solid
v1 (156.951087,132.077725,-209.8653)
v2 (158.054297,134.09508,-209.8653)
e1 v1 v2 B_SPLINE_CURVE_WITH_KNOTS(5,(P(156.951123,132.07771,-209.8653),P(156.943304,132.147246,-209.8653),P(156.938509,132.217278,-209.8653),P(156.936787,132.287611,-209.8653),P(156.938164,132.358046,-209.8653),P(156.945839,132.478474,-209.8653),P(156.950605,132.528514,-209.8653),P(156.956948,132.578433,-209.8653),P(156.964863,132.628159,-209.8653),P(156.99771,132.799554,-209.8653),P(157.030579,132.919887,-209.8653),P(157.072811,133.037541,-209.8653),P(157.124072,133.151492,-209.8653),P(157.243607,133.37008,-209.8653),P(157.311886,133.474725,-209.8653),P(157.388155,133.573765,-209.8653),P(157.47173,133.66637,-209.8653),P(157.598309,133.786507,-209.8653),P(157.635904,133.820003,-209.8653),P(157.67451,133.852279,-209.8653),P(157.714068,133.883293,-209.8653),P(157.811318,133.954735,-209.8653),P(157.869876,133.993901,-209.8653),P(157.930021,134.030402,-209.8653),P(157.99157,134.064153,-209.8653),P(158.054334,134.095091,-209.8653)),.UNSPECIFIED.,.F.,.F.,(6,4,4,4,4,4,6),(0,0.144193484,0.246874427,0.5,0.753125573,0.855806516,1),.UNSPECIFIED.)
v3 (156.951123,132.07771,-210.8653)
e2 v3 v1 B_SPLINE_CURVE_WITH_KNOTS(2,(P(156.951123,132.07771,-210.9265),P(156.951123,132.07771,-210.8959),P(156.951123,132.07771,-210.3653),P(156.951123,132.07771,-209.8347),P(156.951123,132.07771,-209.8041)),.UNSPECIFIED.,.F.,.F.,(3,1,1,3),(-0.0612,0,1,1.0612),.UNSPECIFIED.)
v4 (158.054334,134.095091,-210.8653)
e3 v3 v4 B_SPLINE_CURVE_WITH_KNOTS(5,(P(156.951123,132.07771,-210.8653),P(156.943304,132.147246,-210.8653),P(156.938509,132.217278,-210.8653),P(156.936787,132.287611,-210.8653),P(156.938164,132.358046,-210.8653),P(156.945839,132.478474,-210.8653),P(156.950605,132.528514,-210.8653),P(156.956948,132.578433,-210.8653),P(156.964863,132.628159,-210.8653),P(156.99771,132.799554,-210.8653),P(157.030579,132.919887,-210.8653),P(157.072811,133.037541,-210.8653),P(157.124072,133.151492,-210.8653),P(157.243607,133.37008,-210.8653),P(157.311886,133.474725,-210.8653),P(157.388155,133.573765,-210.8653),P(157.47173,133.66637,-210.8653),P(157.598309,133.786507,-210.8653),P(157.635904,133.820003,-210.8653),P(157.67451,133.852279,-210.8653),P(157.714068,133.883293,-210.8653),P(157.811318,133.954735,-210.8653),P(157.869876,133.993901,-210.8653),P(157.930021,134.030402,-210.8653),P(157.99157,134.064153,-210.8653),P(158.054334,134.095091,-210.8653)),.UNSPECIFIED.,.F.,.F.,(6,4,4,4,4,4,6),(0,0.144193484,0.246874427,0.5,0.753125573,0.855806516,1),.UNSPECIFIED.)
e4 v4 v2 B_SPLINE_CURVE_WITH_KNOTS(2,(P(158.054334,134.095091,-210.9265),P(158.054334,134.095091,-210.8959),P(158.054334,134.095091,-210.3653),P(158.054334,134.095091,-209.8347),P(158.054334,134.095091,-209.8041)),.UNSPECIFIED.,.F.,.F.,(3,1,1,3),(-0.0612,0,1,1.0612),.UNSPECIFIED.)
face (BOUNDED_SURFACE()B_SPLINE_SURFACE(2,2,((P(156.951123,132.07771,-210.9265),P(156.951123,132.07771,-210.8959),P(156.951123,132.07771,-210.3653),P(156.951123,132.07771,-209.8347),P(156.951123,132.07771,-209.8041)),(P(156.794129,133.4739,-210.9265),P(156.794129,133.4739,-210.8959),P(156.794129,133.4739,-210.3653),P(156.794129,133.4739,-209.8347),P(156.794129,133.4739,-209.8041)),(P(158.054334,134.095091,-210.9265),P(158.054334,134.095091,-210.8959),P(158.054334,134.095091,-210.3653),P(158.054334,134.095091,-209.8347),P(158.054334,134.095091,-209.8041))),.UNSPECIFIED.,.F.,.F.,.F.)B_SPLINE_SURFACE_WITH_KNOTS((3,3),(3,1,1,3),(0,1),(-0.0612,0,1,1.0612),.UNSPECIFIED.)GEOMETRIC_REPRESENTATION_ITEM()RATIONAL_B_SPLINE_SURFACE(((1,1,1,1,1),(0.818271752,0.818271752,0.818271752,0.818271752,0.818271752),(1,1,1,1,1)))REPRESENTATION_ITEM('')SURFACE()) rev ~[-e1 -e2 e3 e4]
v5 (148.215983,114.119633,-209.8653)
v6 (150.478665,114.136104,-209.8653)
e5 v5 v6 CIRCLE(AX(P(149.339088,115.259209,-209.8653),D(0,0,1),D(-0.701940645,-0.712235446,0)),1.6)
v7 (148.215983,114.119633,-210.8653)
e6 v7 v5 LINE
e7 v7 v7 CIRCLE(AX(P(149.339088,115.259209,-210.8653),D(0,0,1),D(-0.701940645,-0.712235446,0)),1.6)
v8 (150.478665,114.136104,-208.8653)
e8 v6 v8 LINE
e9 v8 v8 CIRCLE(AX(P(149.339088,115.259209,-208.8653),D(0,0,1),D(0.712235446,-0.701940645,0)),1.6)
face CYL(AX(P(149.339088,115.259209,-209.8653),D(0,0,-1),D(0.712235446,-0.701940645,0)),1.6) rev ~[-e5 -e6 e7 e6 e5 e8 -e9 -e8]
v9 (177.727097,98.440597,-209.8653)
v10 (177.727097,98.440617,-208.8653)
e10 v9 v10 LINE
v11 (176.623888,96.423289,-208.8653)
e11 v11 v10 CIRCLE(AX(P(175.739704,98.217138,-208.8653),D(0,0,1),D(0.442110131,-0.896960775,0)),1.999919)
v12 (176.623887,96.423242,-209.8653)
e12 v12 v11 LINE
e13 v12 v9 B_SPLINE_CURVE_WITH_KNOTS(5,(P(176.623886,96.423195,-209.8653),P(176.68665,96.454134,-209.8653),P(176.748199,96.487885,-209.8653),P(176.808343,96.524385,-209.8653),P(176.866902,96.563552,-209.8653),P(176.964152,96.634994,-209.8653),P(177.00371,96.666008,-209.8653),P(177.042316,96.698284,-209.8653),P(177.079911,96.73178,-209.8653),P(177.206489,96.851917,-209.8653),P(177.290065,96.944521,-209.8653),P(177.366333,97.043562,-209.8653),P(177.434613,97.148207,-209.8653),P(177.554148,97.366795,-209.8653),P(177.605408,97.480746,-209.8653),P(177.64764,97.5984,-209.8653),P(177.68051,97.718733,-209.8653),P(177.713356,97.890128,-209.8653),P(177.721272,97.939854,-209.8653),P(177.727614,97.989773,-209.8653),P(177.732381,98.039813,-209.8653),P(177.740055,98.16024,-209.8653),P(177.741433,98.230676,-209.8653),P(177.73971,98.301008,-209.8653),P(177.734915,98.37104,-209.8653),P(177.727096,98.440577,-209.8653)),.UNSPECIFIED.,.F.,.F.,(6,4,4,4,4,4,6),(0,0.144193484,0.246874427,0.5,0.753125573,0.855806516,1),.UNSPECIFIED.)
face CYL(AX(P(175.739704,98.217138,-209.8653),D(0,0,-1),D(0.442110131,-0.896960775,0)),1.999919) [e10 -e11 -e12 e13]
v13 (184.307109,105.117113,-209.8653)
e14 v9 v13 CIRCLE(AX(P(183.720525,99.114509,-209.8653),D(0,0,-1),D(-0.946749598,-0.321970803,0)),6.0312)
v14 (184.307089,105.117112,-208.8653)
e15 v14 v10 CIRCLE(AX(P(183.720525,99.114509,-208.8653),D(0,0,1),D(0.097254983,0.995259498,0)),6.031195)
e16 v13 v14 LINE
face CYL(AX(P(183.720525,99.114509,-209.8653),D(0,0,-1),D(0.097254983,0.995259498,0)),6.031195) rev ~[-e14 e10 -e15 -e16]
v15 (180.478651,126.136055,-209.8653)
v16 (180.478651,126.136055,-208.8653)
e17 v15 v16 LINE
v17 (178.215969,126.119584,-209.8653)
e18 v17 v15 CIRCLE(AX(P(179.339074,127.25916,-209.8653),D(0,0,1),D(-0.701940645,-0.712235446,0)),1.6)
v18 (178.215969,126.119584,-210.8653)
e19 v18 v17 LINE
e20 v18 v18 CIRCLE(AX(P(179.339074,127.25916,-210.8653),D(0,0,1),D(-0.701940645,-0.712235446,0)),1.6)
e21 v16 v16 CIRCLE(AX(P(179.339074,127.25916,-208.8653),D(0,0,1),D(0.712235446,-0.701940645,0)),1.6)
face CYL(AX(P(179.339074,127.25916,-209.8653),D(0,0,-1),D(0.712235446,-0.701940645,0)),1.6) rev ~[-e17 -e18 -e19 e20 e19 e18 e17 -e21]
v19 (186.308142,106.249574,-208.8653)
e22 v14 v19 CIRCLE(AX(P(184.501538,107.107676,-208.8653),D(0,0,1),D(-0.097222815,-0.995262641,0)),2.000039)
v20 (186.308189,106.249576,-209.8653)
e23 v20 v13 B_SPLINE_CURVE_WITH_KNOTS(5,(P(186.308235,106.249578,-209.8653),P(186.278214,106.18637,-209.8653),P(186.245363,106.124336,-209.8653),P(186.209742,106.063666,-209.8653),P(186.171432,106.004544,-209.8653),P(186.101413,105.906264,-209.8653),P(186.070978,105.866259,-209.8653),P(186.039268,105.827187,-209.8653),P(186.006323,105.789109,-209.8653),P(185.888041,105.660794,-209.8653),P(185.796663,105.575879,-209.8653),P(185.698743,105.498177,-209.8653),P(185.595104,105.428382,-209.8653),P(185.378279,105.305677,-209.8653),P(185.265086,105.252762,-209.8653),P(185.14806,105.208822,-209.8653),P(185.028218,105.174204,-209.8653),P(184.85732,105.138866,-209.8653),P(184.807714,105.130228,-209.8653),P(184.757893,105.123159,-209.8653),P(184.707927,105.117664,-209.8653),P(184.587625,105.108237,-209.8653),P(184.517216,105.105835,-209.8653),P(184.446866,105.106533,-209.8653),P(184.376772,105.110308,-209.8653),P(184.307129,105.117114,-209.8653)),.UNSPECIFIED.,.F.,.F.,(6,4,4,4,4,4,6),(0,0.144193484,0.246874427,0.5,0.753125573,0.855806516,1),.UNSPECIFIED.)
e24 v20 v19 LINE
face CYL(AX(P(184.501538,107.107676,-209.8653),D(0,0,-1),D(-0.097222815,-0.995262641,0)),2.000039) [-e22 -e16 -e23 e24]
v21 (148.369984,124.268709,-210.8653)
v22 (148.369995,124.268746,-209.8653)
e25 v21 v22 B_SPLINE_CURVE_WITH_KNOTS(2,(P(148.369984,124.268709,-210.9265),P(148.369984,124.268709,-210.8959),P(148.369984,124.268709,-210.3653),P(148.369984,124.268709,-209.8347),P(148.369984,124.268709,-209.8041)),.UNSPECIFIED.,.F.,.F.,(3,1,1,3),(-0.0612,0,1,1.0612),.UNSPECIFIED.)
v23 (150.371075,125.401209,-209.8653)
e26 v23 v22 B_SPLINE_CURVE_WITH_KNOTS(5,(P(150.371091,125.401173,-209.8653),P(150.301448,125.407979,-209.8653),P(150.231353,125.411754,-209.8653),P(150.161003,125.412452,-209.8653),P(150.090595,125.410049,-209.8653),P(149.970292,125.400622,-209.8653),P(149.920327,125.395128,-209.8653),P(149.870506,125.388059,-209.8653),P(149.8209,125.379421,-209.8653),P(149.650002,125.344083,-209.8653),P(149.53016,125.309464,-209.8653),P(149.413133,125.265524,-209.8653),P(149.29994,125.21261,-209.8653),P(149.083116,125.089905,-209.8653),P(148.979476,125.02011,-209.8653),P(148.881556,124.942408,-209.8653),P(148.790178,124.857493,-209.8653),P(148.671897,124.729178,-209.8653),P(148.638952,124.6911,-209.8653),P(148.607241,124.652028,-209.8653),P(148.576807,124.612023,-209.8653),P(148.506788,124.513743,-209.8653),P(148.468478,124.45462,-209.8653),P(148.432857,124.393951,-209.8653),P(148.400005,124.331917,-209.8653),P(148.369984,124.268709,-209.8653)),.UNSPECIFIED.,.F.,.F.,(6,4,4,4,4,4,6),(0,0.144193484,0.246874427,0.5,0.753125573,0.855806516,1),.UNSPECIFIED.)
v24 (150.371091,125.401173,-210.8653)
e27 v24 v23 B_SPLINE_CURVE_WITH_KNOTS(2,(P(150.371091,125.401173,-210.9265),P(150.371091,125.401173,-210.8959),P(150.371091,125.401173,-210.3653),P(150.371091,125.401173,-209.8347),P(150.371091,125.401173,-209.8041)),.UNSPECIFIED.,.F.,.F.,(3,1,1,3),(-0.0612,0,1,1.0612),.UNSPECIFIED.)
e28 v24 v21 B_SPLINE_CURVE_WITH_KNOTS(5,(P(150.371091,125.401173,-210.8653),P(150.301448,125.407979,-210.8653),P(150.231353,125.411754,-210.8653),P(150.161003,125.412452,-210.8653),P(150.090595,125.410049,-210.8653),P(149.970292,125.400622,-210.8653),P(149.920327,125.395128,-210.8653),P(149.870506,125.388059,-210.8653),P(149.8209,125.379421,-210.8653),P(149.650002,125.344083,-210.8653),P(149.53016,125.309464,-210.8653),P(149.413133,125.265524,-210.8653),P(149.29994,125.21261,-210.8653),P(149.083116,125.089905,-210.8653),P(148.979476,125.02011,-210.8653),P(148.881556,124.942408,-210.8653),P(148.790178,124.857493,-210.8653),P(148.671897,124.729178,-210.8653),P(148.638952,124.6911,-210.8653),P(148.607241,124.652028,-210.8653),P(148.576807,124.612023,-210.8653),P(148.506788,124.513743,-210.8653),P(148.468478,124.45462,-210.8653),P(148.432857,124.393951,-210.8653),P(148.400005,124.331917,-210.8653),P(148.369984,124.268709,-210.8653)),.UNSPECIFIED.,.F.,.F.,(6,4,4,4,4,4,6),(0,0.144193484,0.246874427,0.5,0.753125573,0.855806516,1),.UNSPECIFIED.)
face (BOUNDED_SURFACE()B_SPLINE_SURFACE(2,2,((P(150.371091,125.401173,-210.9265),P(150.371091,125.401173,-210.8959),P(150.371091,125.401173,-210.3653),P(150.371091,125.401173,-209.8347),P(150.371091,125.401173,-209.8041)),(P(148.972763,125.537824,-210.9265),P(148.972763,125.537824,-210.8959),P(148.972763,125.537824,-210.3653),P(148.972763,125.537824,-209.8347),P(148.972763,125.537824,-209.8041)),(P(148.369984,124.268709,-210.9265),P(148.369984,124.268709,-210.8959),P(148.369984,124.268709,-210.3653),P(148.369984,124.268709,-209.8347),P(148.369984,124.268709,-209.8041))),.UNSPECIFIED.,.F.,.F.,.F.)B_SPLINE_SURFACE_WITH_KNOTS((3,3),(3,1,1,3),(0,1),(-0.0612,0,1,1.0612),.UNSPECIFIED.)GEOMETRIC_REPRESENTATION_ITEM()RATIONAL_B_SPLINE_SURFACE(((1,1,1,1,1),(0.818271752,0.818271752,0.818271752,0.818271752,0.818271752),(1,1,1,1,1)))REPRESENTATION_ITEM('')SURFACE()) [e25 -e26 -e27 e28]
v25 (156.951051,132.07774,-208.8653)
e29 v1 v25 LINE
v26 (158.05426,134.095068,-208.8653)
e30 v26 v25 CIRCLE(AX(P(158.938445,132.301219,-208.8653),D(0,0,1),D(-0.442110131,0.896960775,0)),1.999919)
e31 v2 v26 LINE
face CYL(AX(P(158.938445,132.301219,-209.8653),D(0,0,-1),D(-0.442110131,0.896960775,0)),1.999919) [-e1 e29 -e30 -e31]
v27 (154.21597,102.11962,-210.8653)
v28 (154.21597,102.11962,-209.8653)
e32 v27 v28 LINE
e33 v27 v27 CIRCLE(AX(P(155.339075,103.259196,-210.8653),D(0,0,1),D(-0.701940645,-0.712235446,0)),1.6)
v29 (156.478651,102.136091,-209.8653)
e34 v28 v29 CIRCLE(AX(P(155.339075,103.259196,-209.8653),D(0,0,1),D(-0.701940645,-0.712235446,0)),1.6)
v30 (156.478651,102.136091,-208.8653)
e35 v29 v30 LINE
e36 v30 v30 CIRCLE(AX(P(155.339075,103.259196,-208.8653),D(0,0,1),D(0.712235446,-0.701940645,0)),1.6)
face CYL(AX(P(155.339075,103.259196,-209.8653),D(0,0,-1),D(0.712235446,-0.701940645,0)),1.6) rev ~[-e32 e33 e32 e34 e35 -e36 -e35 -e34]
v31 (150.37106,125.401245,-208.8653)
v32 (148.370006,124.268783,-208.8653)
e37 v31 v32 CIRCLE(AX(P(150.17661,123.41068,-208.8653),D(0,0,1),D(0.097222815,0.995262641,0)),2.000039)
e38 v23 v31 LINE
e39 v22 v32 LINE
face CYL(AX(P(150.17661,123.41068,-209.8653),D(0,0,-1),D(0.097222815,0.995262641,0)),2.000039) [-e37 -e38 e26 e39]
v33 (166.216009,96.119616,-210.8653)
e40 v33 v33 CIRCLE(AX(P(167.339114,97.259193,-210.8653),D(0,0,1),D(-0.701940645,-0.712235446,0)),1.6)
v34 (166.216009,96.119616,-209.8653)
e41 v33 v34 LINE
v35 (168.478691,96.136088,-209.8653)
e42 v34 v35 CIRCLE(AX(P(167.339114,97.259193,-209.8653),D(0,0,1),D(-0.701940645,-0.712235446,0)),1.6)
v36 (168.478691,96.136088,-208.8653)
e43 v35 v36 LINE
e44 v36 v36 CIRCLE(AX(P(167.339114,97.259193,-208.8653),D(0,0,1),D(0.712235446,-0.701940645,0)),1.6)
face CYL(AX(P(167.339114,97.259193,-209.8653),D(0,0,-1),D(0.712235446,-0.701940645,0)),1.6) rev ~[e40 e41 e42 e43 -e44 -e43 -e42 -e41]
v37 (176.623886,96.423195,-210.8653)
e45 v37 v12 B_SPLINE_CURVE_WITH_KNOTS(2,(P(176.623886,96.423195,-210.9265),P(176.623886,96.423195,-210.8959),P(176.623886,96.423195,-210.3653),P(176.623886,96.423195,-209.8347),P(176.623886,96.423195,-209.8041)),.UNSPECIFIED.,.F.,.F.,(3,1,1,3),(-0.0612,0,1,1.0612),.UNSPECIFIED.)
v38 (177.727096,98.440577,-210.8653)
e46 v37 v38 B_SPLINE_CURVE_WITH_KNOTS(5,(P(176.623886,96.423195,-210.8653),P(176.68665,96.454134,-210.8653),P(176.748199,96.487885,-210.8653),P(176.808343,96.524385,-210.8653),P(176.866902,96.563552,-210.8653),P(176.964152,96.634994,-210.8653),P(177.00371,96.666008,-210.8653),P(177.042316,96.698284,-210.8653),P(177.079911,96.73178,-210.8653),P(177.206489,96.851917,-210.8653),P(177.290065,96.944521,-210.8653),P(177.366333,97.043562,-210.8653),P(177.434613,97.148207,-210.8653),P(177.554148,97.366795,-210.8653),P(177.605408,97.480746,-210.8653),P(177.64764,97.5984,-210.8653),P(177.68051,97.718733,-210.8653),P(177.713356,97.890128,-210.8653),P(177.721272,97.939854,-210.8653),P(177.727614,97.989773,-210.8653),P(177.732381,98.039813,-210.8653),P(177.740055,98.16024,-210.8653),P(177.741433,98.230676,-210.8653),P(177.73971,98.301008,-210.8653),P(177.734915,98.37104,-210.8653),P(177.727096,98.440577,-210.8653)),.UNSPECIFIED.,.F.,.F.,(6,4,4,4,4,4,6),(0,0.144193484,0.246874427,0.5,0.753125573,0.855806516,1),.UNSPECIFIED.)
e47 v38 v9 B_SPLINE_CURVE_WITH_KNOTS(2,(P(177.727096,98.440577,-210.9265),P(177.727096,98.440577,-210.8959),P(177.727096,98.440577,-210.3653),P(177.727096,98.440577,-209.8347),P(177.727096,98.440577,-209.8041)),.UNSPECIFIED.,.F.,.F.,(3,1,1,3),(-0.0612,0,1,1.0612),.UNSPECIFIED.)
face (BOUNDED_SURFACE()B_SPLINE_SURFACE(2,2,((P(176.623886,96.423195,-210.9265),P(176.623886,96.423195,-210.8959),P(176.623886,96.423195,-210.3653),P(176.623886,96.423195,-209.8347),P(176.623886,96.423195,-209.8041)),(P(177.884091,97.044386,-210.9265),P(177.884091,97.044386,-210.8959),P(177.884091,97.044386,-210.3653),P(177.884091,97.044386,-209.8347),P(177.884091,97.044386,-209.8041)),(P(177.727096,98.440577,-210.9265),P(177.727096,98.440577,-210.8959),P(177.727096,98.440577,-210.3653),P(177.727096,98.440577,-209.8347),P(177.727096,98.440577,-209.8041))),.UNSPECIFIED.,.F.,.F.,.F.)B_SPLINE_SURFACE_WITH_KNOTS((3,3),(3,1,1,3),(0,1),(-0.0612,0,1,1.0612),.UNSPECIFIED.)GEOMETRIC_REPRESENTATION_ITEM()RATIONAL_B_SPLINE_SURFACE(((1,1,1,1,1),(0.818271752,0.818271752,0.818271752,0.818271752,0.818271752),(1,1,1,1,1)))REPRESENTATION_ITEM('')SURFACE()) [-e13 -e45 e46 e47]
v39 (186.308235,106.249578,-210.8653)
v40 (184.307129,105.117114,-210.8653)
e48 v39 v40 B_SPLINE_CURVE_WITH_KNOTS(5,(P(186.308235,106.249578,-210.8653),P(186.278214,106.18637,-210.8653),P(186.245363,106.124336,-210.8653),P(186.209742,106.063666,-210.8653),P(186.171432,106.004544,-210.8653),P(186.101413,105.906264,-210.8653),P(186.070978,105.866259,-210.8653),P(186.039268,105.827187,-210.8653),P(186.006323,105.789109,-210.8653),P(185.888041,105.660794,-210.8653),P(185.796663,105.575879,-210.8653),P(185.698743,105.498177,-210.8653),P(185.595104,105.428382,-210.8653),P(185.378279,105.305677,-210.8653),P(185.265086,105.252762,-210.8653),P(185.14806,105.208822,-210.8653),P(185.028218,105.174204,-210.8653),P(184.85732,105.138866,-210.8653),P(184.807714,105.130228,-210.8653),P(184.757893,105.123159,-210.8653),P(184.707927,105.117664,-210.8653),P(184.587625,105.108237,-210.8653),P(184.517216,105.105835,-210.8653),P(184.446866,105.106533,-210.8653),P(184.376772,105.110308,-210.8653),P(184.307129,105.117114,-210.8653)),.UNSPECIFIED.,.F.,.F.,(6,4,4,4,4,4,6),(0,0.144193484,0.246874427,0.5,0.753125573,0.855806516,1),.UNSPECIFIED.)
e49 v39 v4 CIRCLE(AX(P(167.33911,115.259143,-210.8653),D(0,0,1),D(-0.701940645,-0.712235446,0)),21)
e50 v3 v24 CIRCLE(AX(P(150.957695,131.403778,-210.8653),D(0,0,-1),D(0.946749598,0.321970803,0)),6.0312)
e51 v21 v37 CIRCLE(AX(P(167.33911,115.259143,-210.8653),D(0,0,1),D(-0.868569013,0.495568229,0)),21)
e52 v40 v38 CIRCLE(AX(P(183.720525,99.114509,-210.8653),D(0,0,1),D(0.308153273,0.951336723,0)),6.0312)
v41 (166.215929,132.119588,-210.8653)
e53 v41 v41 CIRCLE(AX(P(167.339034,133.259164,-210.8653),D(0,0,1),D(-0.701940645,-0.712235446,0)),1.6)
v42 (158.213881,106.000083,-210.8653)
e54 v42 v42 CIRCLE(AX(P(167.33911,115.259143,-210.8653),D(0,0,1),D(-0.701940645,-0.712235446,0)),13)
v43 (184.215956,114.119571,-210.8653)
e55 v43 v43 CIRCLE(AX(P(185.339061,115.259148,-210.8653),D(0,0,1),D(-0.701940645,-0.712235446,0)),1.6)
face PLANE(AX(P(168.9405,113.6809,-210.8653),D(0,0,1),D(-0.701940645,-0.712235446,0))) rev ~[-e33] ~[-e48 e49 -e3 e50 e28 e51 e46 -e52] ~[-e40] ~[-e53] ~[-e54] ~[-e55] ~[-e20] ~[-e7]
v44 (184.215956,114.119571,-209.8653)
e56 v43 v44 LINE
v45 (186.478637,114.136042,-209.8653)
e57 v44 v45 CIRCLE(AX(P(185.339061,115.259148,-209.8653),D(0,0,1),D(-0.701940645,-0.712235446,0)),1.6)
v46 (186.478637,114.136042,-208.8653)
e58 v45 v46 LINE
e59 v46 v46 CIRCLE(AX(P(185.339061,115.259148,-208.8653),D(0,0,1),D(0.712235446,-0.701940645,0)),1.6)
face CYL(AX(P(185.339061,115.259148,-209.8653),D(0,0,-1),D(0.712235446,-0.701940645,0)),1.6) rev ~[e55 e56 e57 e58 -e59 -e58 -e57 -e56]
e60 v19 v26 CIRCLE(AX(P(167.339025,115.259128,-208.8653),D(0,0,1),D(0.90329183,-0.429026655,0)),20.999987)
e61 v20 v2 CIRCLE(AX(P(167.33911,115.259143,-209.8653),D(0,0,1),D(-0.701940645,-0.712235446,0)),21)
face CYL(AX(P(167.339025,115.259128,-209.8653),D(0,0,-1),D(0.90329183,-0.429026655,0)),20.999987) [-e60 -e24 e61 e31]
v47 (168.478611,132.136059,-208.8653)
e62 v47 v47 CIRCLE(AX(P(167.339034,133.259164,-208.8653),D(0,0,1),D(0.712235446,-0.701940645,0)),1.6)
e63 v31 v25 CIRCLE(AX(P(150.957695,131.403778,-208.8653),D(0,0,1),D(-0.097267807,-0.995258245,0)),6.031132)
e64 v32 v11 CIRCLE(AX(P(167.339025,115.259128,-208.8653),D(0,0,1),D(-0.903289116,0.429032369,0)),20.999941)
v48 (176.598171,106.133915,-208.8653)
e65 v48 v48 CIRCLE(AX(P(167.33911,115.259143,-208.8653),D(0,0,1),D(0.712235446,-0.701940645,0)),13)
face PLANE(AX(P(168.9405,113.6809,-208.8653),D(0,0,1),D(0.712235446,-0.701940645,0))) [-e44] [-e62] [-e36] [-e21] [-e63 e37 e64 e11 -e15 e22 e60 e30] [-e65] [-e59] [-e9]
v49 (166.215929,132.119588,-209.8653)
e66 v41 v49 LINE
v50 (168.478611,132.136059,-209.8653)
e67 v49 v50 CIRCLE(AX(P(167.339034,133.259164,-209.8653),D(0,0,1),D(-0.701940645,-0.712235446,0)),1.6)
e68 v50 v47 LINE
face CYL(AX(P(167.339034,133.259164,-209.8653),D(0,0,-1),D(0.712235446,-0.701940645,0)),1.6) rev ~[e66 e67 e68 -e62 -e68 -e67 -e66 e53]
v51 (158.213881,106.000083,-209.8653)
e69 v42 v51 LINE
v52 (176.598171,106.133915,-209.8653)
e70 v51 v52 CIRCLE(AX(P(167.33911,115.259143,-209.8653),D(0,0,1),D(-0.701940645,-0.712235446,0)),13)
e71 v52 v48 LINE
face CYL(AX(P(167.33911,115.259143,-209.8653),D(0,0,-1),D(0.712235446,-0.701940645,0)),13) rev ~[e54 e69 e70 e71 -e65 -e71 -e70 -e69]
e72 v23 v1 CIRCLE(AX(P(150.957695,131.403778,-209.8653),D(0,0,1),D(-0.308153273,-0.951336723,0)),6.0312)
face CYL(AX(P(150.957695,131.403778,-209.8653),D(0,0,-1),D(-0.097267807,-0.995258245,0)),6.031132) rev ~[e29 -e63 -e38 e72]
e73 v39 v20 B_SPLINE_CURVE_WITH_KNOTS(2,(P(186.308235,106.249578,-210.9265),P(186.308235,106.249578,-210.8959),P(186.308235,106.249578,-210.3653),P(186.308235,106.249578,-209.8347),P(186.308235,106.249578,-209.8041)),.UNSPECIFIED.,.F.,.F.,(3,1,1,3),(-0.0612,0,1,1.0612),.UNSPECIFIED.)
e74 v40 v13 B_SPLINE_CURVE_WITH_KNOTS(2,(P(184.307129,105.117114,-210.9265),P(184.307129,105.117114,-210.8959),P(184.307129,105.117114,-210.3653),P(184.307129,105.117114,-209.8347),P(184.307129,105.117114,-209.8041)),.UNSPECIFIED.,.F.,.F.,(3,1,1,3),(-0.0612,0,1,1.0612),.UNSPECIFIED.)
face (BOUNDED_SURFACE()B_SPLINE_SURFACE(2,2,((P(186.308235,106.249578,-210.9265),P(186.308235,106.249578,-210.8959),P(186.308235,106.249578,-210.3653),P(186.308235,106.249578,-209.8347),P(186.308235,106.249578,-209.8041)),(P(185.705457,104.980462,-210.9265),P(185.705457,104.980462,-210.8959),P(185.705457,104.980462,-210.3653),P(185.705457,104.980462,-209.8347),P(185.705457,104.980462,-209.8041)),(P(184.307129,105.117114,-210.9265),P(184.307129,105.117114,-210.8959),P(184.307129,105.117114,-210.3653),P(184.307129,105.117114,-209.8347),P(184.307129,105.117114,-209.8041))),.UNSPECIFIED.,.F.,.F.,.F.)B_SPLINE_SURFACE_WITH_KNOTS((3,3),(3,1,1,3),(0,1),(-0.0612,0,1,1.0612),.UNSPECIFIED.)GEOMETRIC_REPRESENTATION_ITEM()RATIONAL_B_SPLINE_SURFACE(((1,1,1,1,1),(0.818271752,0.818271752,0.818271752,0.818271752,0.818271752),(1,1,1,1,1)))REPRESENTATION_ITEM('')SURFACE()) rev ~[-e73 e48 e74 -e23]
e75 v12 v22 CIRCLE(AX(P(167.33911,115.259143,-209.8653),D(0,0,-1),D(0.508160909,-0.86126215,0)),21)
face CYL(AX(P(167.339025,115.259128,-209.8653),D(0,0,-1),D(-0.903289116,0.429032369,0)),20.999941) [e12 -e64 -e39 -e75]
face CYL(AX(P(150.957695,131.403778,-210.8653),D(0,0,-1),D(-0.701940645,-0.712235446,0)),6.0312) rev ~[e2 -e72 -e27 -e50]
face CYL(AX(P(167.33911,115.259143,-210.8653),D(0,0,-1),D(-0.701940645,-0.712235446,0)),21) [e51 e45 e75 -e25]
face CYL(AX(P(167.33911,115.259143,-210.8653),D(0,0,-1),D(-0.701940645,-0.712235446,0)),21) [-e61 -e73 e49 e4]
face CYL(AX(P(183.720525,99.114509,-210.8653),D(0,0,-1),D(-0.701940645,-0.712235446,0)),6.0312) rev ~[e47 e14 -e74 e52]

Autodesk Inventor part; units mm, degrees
ref_plane "YZ Plane" through (0, 0, 0) normal (1, 0, 0) x (0, 1, 0)
ref_plane "XZ Plane" through (0, 0, 0) normal (0, 1, 0) x (-1, 0, 0)
ref_plane "작업 평면1" through (168.9405, 113.6809, -210.8653) normal (0, 0, 1) x (-0.7019406, -0.7122354, 0)
sketch "스케치1" plane through (168.9405, 113.6809, -210.8653) normal (0, 0, 1) x (-0.7019406, -0.7122354, 0)
  circle A0 centre (0, -25.2484) radius 3 projected
  circle A1 centre (0, -2.2484) radius 13 projected
  circle A2 centre (-12.6349, 10.5718) radius 1.6 projected
  circle A3 centre (12.6349, -15.0687) radius 1.6 projected
  circle A4 centre (0.1235, 14.7217) radius 1.6 projected
  circle A5 centre (-0.1235, -19.2186) radius 1.6 projected
  circle A6 centre (-16.9701, -2.1249) radius 1.6 projected
  circle A7 centre (16.9701, -2.372) radius 1.6 projected
  circle A8 centre (12.8202, 10.3865) radius 1.6 projected
  circle A9 centre (-12.8202, -14.8834) radius 1.6 projected
  circle A10 centre (0, 20.7516) radius 3 projected
  arc A11 (-2.0317, -50.1272) -> (-0.57, -54.2453) centre (7.4248, -49.0892) ccw projected
  line L0 (0.57, -54.2453) -> (-0.57, -54.2453) projected
  arc A12 (0.57, -54.2453) -> (2.0317, -50.1272) centre (-7.4248, -49.0892) ccw projected
  arc A13 (2.5023, -49.6825) -> (2.0317, -50.1272) centre (2.5287, -50.1818) ccw projected
  arc A14 (2.5023, -49.6825) -> (3.4624, -49.6221) centre (0, -2.2484) ccw projected
  arc A15 (3.9852, -50.0043) -> (3.4624, -49.6221) centre (3.4989, -50.1207) ccw projected
  arc A16 (3.9852, -50.0043) -> (5.9514, -53.9067) centre (13.237, -47.7893) ccw projected
  line L1 (7.0824, -53.7639) -> (5.9514, -53.9067) projected
  arc A17 (7.0824, -53.7639) -> (8.0165, -49.4951) centre (-1.4956, -49.6504) ccw projected
  arc A18 (8.4277, -48.9948) -> (8.0165, -49.4951) centre (8.5164, -49.4869) ccw projected
  arc A19 (8.4277, -48.9948) -> (9.3726, -48.8146) centre (0, -2.2484) ccw projected
  arc A20 (9.9391, -49.1283) -> (9.3726, -48.8146) centre (9.4713, -49.3047) ccw projected
  arc A21 (9.9391, -49.1283) -> (12.379, -52.7535) centre (18.8404, -45.7711) ccw projected
  line L2 (13.4832, -52.47) -> (12.379, -52.7535) projected
  arc A22 (13.4832, -52.47) -> (13.8748, -48.1178) centre (4.4572, -49.4641) ccw projected
  arc A23 (14.2201, -47.5699) -> (13.8748, -48.1178) centre (14.3698, -48.047) ccw projected
  arc A24 (14.2201, -47.5699) -> (15.135, -47.2727) centre (0, -2.2484) ccw projected
  arc A25 (15.7364, -47.5129) -> (15.135, -47.2727) centre (15.2943, -47.7466) ccw projected
  arc A26 (15.7364, -47.5129) -> (18.6114, -50.8037) centre (24.1467, -43.0666) ccw projected
  line L3 (19.6713, -50.3841) -> (18.6114, -50.8037) projected
  arc A27 (19.6713, -50.3841) -> (19.5144, -46.0171) centre (10.3398, -48.5331) ccw projected
  arc A28 (19.7883, -45.4303) -> (19.5144, -46.0171) centre (19.9966, -45.8849) ccw projected
  arc A29 (19.7883, -45.4303) -> (20.6587, -45.0207) centre (0, -2.2484) ccw projected
  arc A30 (21.2854, -45.1837) -> (20.6587, -45.0207) centre (20.8762, -45.471) ccw projected
  arc A31 (21.2854, -45.1837) -> (24.5502, -48.0882) centre (29.0721, -39.7184) ccw projected
  line L4 (25.5492, -47.539) -> (24.5502, -48.0882) projected
  arc A32 (25.5492, -47.539) -> (24.8461, -43.2262) centre (16.0593, -46.8722) ccw projected
  arc A33 (25.0443, -42.6097) -> (24.8461, -43.2262) centre (25.308, -43.0345) ccw projected
  arc A34 (25.0443, -42.6097) -> (25.8566, -42.0942) centre (0, -2.2484) ccw projected
  arc A35 (26.4988, -42.1774) -> (25.8566, -42.0942) centre (26.1288, -42.5137) ccw projected
  arc A36 (26.4988, -42.1774) -> (30.1019, -44.6498) centre (33.5391, -35.7792) ccw projected
  line L5 (31.0241, -43.9798) -> (30.1019, -44.6498) projected
  arc A37 (31.0241, -43.9798) -> (29.7861, -39.789) centre (21.5255, -44.5076) ccw projected
  arc A38 (29.9055, -39.1525) -> (29.7861, -39.789) centre (30.2203, -39.541) ccw projected
  arc A39 (29.9055, -39.1525) -> (30.6467, -38.5393) centre (0, -2.2484) ccw projected
  arc A40 (31.2943, -38.5413) -> (30.6467, -38.5393) centre (30.9693, -38.9213) ccw projected
  arc A41 (31.2943, -38.5413) -> (35.1788, -40.5427) centre (37.4772, -31.3112) ccw projected
  line L6 (36.0098, -39.7623) -> (35.1788, -40.5427) projected
  arc A42 (36.0098, -39.7623) -> (34.2563, -35.7598) centre (26.6522, -41.4765) ccw projected
  arc A43 (34.295, -35.1134) -> (34.2563, -35.7598) centre (34.656, -35.4593) ccw projected
  arc A44 (34.295, -35.1134) -> (34.9535, -34.4121) centre (0, -2.2484) ccw projected
  arc A45 (35.5962, -34.333) -> (34.9535, -34.4121) centre (35.3214, -34.7507) ccw projected
  arc A46 (35.5962, -34.333) -> (39.7009, -35.8317) centre (40.8242, -26.3849) ccw projected
  line L7 (40.4276, -34.9533) -> (39.7009, -35.8317) projected
  arc A47 (40.4276, -34.9533) -> (38.1863, -31.2021) centre (31.3586, -37.8268) ccw projected
  arc A48 (38.1436, -30.5559) -> (38.1863, -31.2021) centre (38.5451, -30.8539) ccw projected
  arc A49 (38.1436, -30.5559) -> (38.7091, -29.7777) centre (0, -2.2484) ccw projected
  arc A50 (39.3368, -29.6186) -> (38.7091, -29.7777) centre (39.1165, -30.0674) ccw projected
  arc A51 (39.3368, -29.6186) -> (43.597, -30.591) centre (43.5274, -21.078) ccw projected
  line L8 (44.2078, -29.6285) -> (43.597, -30.591) projected
  arc A52 (44.2078, -29.6285) -> (41.514, -26.1878) centre (35.5705, -33.616) ccw projected
  arc A53 (41.3907, -25.5521) -> (41.514, -26.1878) centre (41.8264, -25.7974) ccw projected
  arc A54 (41.3907, -25.5521) -> (41.8542, -24.7091) centre (0, -2.2484) ccw projected
  arc A55 (42.457, -24.4725) -> (41.8542, -24.7091) centre (42.2947, -24.9455) ccw projected
  arc A56 (42.457, -24.4725) -> (46.8055, -24.9034) centre (45.5441, -15.4741) ccw projected
  line L9 (47.2909, -23.8719) -> (46.8055, -24.9034) projected
  arc A57 (47.2909, -23.8719) -> (44.1871, -20.7959) centre (39.2214, -28.9105) ccw projected
  arc A58 (43.985, -20.1807) -> (44.1871, -20.7959) centre (44.4481, -20.3694) ccw projected
  arc A59 (43.985, -20.1807) -> (44.3392, -19.2862) centre (0, -2.2484) ccw projected
  arc A60 (44.9076, -18.976) -> (44.3392, -19.2862) centre (44.8059, -19.4656) ccw projected
  arc A61 (44.9076, -18.976) -> (49.2758, -18.8585) centre (46.8426, -9.6616) ccw projected
  line L10 (49.6281, -17.7743) -> (49.2758, -18.8585) projected
  arc A62 (49.6281, -17.7743) -> (46.1633, -15.1116) centre (42.2538, -23.7845) ccw projected
  arc A63 (45.8857, -14.5265) -> (46.1633, -15.1116) centre (46.3687, -14.6557) ccw projected
  arc A64 (45.8857, -14.5265) -> (46.125, -13.5947) centre (0, -2.2484) ccw projected
  arc A65 (46.65, -13.2157) -> (46.125, -13.5947) centre (46.6105, -13.7141) ccw projected
  arc A66 (46.65, -13.2157) -> (50.9691, -12.5516) centre (47.4023, -3.7322) ccw projected
  line L11 (51.1827, -11.4318) -> (50.9691, -12.5516) projected
  arc A67 (51.1827, -11.4318) -> (47.4114, -9.2243) centre (44.6198, -18.3188) ccw projected
  arc A68 (47.0627, -8.6787) -> (47.4114, -9.2243) centre (47.5581, -8.7464) ccw projected
  arc A69 (47.0627, -8.6787) -> (47.1833, -7.7243) centre (0, -2.2484) ccw projected
  arc A70 (47.6567, -7.2824) -> (47.1833, -7.7243) centre (47.68, -7.7819) ccw projected
  arc A71 (47.6567, -7.2824) -> (51.8585, -6.0822) centre (47.2145, 2.2206) ccw projected
  line L12 (51.9301, -4.9445) -> (51.8585, -6.0822) projected
  arc A72 (51.9301, -4.9445) -> (47.9119, -3.2271) centre (46.2821, -12.5998) ccw projected
  arc A73 (47.4976, -2.7294) -> (47.9119, -3.2271) centre (47.9975, -2.7345) ccw projected
  arc A74 (47.4976, -2.7294) -> (47.4976, -1.7674) centre (0, -2.2484) ccw projected
  arc A75 (47.9119, -1.2698) -> (47.4976, -1.7674) centre (47.9975, -1.7624) ccw projected
  arc A76 (47.9119, -1.2698) -> (51.9301, 0.4476) centre (46.2821, 8.1029) ccw projected
  line L13 (51.8585, 1.5853) -> (51.9301, 0.4476) projected
  arc A77 (51.8585, 1.5853) -> (47.6567, 2.7856) centre (47.2145, -6.7175) ccw projected
  arc A78 (47.1833, 3.2274) -> (47.6567, 2.7856) centre (47.68, 3.285) ccw projected
  arc A79 (47.1833, 3.2274) -> (47.0627, 4.1818) centre (0, -2.2484) ccw projected
  arc A80 (47.4114, 4.7275) -> (47.0627, 4.1818) centre (47.5581, 4.2495) ccw projected
  arc A81 (47.4114, 4.7275) -> (51.1827, 6.9349) centre (44.6198, 13.822) ccw projected
  line L14 (50.9691, 8.0547) -> (51.1827, 6.9349) projected
  arc A82 (50.9691, 8.0547) -> (46.65, 8.7188) centre (47.4023, -0.7647) ccw projected
  arc A83 (46.125, 9.0978) -> (46.65, 8.7188) centre (46.6105, 9.2173) ccw projected
  arc A84 (46.125, 9.0978) -> (45.8857, 10.0296) centre (0, -2.2484) ccw projected
  arc A85 (46.1633, 10.6147) -> (45.8857, 10.0296) centre (46.3687, 10.1589) ccw projected
  arc A86 (46.1633, 10.6147) -> (49.6281, 13.2774) centre (42.2538, 19.2876) ccw projected
  line L15 (49.2758, 14.3616) -> (49.6281, 13.2774) projected
  arc A87 (49.2758, 14.3616) -> (44.9076, 14.4792) centre (46.8426, 5.1647) ccw projected
  arc A88 (44.3392, 14.7894) -> (44.9076, 14.4792) centre (44.8059, 14.9687) ccw projected
  arc A89 (44.3392, 14.7894) -> (43.985, 15.6838) centre (0, -2.2484) ccw projected
  arc A90 (44.1871, 16.299) -> (43.985, 15.6838) centre (44.4481, 15.8726) ccw projected
  arc A91 (44.1871, 16.299) -> (47.2909, 19.375) centre (39.2214, 24.4136) ccw projected
  line L16 (46.8055, 20.4065) -> (47.2909, 19.375) projected
  arc A92 (46.8055, 20.4065) -> (42.457, 19.9757) centre (45.5441, 10.9772) ccw projected
  arc A93 (41.8542, 20.2122) -> (42.457, 19.9757) centre (42.2947, 20.4486) ccw projected
  arc A94 (41.8542, 20.2122) -> (41.3907, 21.0552) centre (0, -2.2484) ccw projected
  arc A95 (41.514, 21.6909) -> (41.3907, 21.0552) centre (41.8264, 21.3005) ccw projected
  arc A96 (41.514, 21.6909) -> (44.2078, 25.1316) centre (35.5705, 29.1191) ccw projected
  line L17 (43.597, 26.0941) -> (44.2078, 25.1316) projected
  arc A97 (43.597, 26.0941) -> (39.3368, 25.1217) centre (43.5274, 16.5811) ccw projected
  arc A98 (38.7091, 25.2808) -> (39.3368, 25.1217) centre (39.1165, 25.5706) ccw projected
  arc A99 (38.7091, 25.2808) -> (38.1436, 26.0591) centre (0, -2.2484) ccw projected
  arc A100 (38.1863, 26.7052) -> (38.1436, 26.0591) centre (38.5451, 26.357) ccw projected
  arc A101 (38.1863, 26.7052) -> (40.4276, 30.4564) centre (31.3586, 33.3299) ccw projected
  line L18 (39.7009, 31.3348) -> (40.4276, 30.4564) projected
  arc A102 (39.7009, 31.3348) -> (35.5962, 29.8361) centre (40.8242, 21.888) ccw projected
  arc A103 (34.9535, 29.9152) -> (35.5962, 29.8361) centre (35.3214, 30.2538) ccw projected
  arc A104 (34.9535, 29.9152) -> (34.295, 30.6165) centre (0, -2.2484) ccw projected
  arc A105 (34.2563, 31.2629) -> (34.295, 30.6165) centre (34.656, 30.9625) ccw projected
  arc A106 (34.2563, 31.2629) -> (36.0098, 35.2655) centre (26.6522, 36.9797) ccw projected
  line L19 (35.1788, 36.0458) -> (36.0098, 35.2655) projected
  arc A107 (35.1788, 36.0458) -> (31.2943, 34.0445) centre (37.4772, 26.8143) ccw projected
  arc A108 (30.6467, 34.0425) -> (31.2943, 34.0445) centre (30.9693, 34.4245) ccw projected
  arc A109 (30.6467, 34.0425) -> (29.9055, 34.6557) centre (0, -2.2484) ccw projected
  arc A110 (29.7861, 35.2921) -> (29.9055, 34.6557) centre (30.2203, 35.0441) ccw projected
  arc A111 (29.7861, 35.2921) -> (31.0241, 39.4829) centre (21.5255, 40.0107) ccw projected
  line L20 (30.1019, 40.153) -> (31.0241, 39.4829) projected
  arc A112 (30.1019, 40.153) -> (26.4988, 37.6805) centre (33.5391, 31.2823) ccw projected
  arc A113 (25.8566, 37.5973) -> (26.4988, 37.6805) centre (26.1288, 38.0168) ccw projected
  arc A114 (25.8566, 37.5973) -> (25.0443, 38.1128) centre (0, -2.2484) ccw projected
  arc A115 (24.8461, 38.7293) -> (25.0443, 38.1128) centre (25.308, 38.5377) ccw projected
  arc A116 (24.8461, 38.7293) -> (25.5492, 43.0422) centre (16.0593, 42.3754) ccw projected
  line L21 (24.5502, 43.5914) -> (25.5492, 43.0422) projected
  arc A117 (24.5502, 43.5914) -> (21.2854, 40.6868) centre (29.0721, 35.2215) ccw projected
  arc A118 (20.6587, 40.5238) -> (21.2854, 40.6868) centre (20.8762, 40.9741) ccw projected
  arc A119 (20.6587, 40.5238) -> (19.7883, 40.9334) centre (0, -2.2484) ccw projected
  arc A120 (19.5144, 41.5202) -> (19.7883, 40.9334) centre (19.9966, 41.388) ccw projected
  arc A121 (19.5144, 41.5202) -> (19.6713, 45.8872) centre (10.3398, 44.0363) ccw projected
  line L22 (18.6114, 46.3069) -> (19.6713, 45.8872) projected
  arc A122 (18.6114, 46.3069) -> (15.7364, 43.016) centre (24.1467, 38.5697) ccw projected
  arc A123 (15.135, 42.7758) -> (15.7364, 43.016) centre (15.2943, 43.2497) ccw projected
  arc A124 (15.135, 42.7758) -> (14.2201, 43.0731) centre (0, -2.2484) ccw projected
  arc A125 (13.8748, 43.6209) -> (14.2201, 43.0731) centre (14.3698, 43.5501) ccw projected
  arc A126 (13.8748, 43.6209) -> (13.4832, 47.9731) centre (4.4572, 44.9672) ccw projected
  line L23 (12.379, 48.2566) -> (13.4832, 47.9731) projected
  arc A127 (12.379, 48.2566) -> (9.9391, 44.6314) centre (18.8404, 41.2742) ccw projected
  arc A128 (9.3726, 44.3177) -> (9.9391, 44.6314) centre (9.4713, 44.8079) ccw projected
  arc A129 (9.3726, 44.3177) -> (8.4277, 44.4979) centre (0, -2.2484) ccw projected
  arc A130 (8.0165, 44.9982) -> (8.4277, 44.4979) centre (8.5164, 44.99) ccw projected
  arc A131 (8.0165, 44.9982) -> (7.0824, 49.267) centre (-1.4956, 45.1535) ccw projected
  line L24 (5.9514, 49.4099) -> (7.0824, 49.267) projected
  arc A132 (5.9514, 49.4099) -> (3.9852, 45.5074) centre (13.237, 43.2924) ccw projected
  arc A133 (3.4624, 45.1252) -> (3.9852, 45.5074) centre (3.4989, 45.6239) ccw projected
  arc A134 (3.4624, 45.1252) -> (2.5023, 45.1856) centre (0, -2.2484) ccw projected
  arc A135 (2.0317, 45.6304) -> (2.5023, 45.1856) centre (2.5287, 45.6849) ccw projected
  arc A136 (2.0317, 45.6304) -> (0.57, 49.7484) centre (-7.4248, 44.5923) ccw projected
  line L25 (-0.57, 49.7484) -> (0.57, 49.7484) projected
  arc A137 (-0.57, 49.7484) -> (-2.0317, 45.6304) centre (7.4248, 44.5923) ccw projected
  arc A138 (-2.5023, 45.1856) -> (-2.0317, 45.6304) centre (-2.5287, 45.6849) ccw projected
  arc A139 (-2.5023, 45.1856) -> (-3.4624, 45.1252) centre (0, -2.2484) ccw projected
  arc A140 (-3.9852, 45.5074) -> (-3.4624, 45.1252) centre (-3.4989, 45.6239) ccw projected
  arc A141 (-3.9852, 45.5074) -> (-5.9514, 49.4099) centre (-13.237, 43.2924) ccw projected
  line L26 (-7.0824, 49.267) -> (-5.9514, 49.4099) projected
  arc A142 (-7.0824, 49.267) -> (-8.0165, 44.9982) centre (1.4956, 45.1535) ccw projected
  arc A143 (-8.4277, 44.4979) -> (-8.0165, 44.9982) centre (-8.5164, 44.99) ccw projected
  arc A144 (-8.4277, 44.4979) -> (-9.3726, 44.3177) centre (0, -2.2484) ccw projected
  arc A145 (-9.9391, 44.6314) -> (-9.3726, 44.3177) centre (-9.4713, 44.8079) ccw projected
  arc A146 (-9.9391, 44.6314) -> (-12.379, 48.2566) centre (-18.8404, 41.2742) ccw projected
  line L27 (-13.4832, 47.9731) -> (-12.379, 48.2566) projected
  arc A147 (-13.4832, 47.9731) -> (-13.8748, 43.6209) centre (-4.4572, 44.9672) ccw projected
  arc A148 (-14.2201, 43.0731) -> (-13.8748, 43.6209) centre (-14.3698, 43.5501) ccw projected
  arc A149 (-14.2201, 43.0731) -> (-15.135, 42.7758) centre (0, -2.2484) ccw projected
  arc A150 (-15.7364, 43.016) -> (-15.135, 42.7758) centre (-15.2943, 43.2497) ccw projected
  arc A151 (-15.7364, 43.016) -> (-18.6114, 46.3069) centre (-24.1467, 38.5697) ccw projected
  line L28 (-19.6713, 45.8872) -> (-18.6114, 46.3069) projected
  arc A152 (-19.6713, 45.8872) -> (-19.5144, 41.5202) centre (-10.3398, 44.0363) ccw projected
  arc A153 (-19.7883, 40.9334) -> (-19.5144, 41.5202) centre (-19.9966, 41.388) ccw projected
  arc A154 (-19.7883, 40.9334) -> (-20.6587, 40.5238) centre (0, -2.2484) ccw projected
  arc A155 (-21.2854, 40.6868) -> (-20.6587, 40.5238) centre (-20.8762, 40.9741) ccw projected
  arc A156 (-21.2854, 40.6868) -> (-24.5502, 43.5914) centre (-29.0721, 35.2215) ccw projected
  line L29 (-25.5492, 43.0422) -> (-24.5502, 43.5914) projected
  arc A157 (-25.5492, 43.0422) -> (-24.8461, 38.7293) centre (-16.0593, 42.3754) ccw projected
  arc A158 (-25.0443, 38.1128) -> (-24.8461, 38.7293) centre (-25.308, 38.5377) ccw projected
  arc A159 (-25.0443, 38.1128) -> (-25.8566, 37.5973) centre (0, -2.2484) ccw projected
  arc A160 (-26.4988, 37.6805) -> (-25.8566, 37.5973) centre (-26.1288, 38.0168) ccw projected
  arc A161 (-26.4988, 37.6805) -> (-30.1019, 40.153) centre (-33.5391, 31.2823) ccw projected
  line L30 (-31.0241, 39.4829) -> (-30.1019, 40.153) projected
  arc A162 (-31.0241, 39.4829) -> (-29.7861, 35.2921) centre (-21.5255, 40.0107) ccw projected
  arc A163 (-29.9055, 34.6557) -> (-29.7861, 35.2921) centre (-30.2203, 35.0441) ccw projected
  arc A164 (-29.9055, 34.6557) -> (-30.6467, 34.0425) centre (0, -2.2484) ccw projected
  arc A165 (-31.2943, 34.0445) -> (-30.6467, 34.0425) centre (-30.9693, 34.4245) ccw projected
  arc A166 (-31.2943, 34.0445) -> (-35.1788, 36.0458) centre (-37.4772, 26.8143) ccw projected
  line L31 (-36.0098, 35.2655) -> (-35.1788, 36.0458) projected
  arc A167 (-36.0098, 35.2655) -> (-34.2563, 31.2629) centre (-26.6522, 36.9797) ccw projected
  arc A168 (-34.295, 30.6165) -> (-34.2563, 31.2629) centre (-34.656, 30.9625) ccw projected
  arc A169 (-34.295, 30.6165) -> (-34.9535, 29.9152) centre (0, -2.2484) ccw projected
  arc A170 (-35.5962, 29.8361) -> (-34.9535, 29.9152) centre (-35.3214, 30.2538) ccw projected
  arc A171 (-35.5962, 29.8361) -> (-39.7009, 31.3348) centre (-40.8242, 21.888) ccw projected
  line L32 (-40.4276, 30.4564) -> (-39.7009, 31.3348) projected
  arc A172 (-40.4276, 30.4564) -> (-38.1863, 26.7052) centre (-31.3586, 33.3299) ccw projected
  arc A173 (-38.1436, 26.0591) -> (-38.1863, 26.7052) centre (-38.5451, 26.357) ccw projected
  arc A174 (-38.1436, 26.0591) -> (-38.7091, 25.2808) centre (0, -2.2484) ccw projected
  arc A175 (-39.3368, 25.1217) -> (-38.7091, 25.2808) centre (-39.1165, 25.5706) ccw projected
  arc A176 (-39.3368, 25.1217) -> (-43.597, 26.0941) centre (-43.5274, 16.5811) ccw projected
  line L33 (-44.2078, 25.1316) -> (-43.597, 26.0941) projected
  arc A177 (-44.2078, 25.1316) -> (-41.514, 21.6909) centre (-35.5705, 29.1191) ccw projected
  arc A178 (-41.3907, 21.0552) -> (-41.514, 21.6909) centre (-41.8264, 21.3005) ccw projected
  arc A179 (-41.3907, 21.0552) -> (-41.8542, 20.2122) centre (0, -2.2484) ccw projected
  arc A180 (-42.457, 19.9757) -> (-41.8542, 20.2122) centre (-42.2947, 20.4486) ccw projected
  arc A181 (-42.457, 19.9757) -> (-46.8055, 20.4065) centre (-45.5441, 10.9772) ccw projected
  line L34 (-47.2909, 19.375) -> (-46.8055, 20.4065) projected
  arc A182 (-47.2909, 19.375) -> (-44.1871, 16.299) centre (-39.2214, 24.4136) ccw projected
  arc A183 (-43.985, 15.6838) -> (-44.1871, 16.299) centre (-44.4481, 15.8726) ccw projected
  arc A184 (-43.985, 15.6838) -> (-44.3392, 14.7894) centre (0, -2.2484) ccw projected
  arc A185 (-44.9076, 14.4792) -> (-44.3392, 14.7894) centre (-44.8059, 14.9687) ccw projected
  arc A186 (-44.9076, 14.4792) -> (-49.2758, 14.3616) centre (-46.8426, 5.1647) ccw projected
  line L35 (-49.6281, 13.2774) -> (-49.2758, 14.3616) projected
  arc A187 (-49.6281, 13.2774) -> (-46.1633, 10.6147) centre (-42.2538, 19.2876) ccw projected
  arc A188 (-45.8857, 10.0296) -> (-46.1633, 10.6147) centre (-46.3687, 10.1589) ccw projected
  arc A189 (-45.8857, 10.0296) -> (-46.125, 9.0978) centre (0, -2.2484) ccw projected
  arc A190 (-46.65, 8.7188) -> (-46.125, 9.0978) centre (-46.6105, 9.2173) ccw projected
  arc A191 (-46.65, 8.7188) -> (-50.9691, 8.0547) centre (-47.4023, -0.7647) ccw projected
  line L36 (-51.1827, 6.9349) -> (-50.9691, 8.0547) projected
  arc A192 (-51.1827, 6.9349) -> (-47.4114, 4.7275) centre (-44.6198, 13.822) ccw projected
  arc A193 (-47.0627, 4.1818) -> (-47.4114, 4.7275) centre (-47.5581, 4.2495) ccw projected
  arc A194 (-47.0627, 4.1818) -> (-47.1833, 3.2274) centre (0, -2.2484) ccw projected
  arc A195 (-47.6567, 2.7856) -> (-47.1833, 3.2274) centre (-47.68, 3.285) ccw projected
  arc A196 (-47.6567, 2.7856) -> (-51.8585, 1.5853) centre (-47.2145, -6.7175) ccw projected
  line L37 (-51.9301, 0.4476) -> (-51.8585, 1.5853) projected
  arc A197 (-51.9301, 0.4476) -> (-47.9119, -1.2698) centre (-46.2821, 8.1029) ccw projected
  arc A198 (-47.4976, -1.7674) -> (-47.9119, -1.2698) centre (-47.9975, -1.7624) ccw projected
  arc A199 (-47.4976, -1.7674) -> (-47.4976, -2.7294) centre (0, -2.2484) ccw projected
  arc A200 (-47.9119, -3.2271) -> (-47.4976, -2.7294) centre (-47.9975, -2.7345) ccw projected
  arc A201 (-47.9119, -3.2271) -> (-51.9301, -4.9445) centre (-46.2821, -12.5998) ccw projected
  line L38 (-51.8585, -6.0822) -> (-51.9301, -4.9445) projected
  arc A202 (-51.8585, -6.0822) -> (-47.6567, -7.2824) centre (-47.2145, 2.2206) ccw projected
  arc A203 (-47.1833, -7.7243) -> (-47.6567, -7.2824) centre (-47.68, -7.7819) ccw projected
  arc A204 (-47.1833, -7.7243) -> (-47.0627, -8.6787) centre (0, -2.2484) ccw projected
  arc A205 (-47.4114, -9.2243) -> (-47.0627, -8.6787) centre (-47.5581, -8.7464) ccw projected
  arc A206 (-47.4114, -9.2243) -> (-51.1827, -11.4318) centre (-44.6198, -18.3188) ccw projected
  line L39 (-50.9691, -12.5516) -> (-51.1827, -11.4318) projected
  arc A207 (-50.9691, -12.5516) -> (-46.65, -13.2157) centre (-47.4023, -3.7322) ccw projected
  arc A208 (-46.125, -13.5947) -> (-46.65, -13.2157) centre (-46.6105, -13.7141) ccw projected
  arc A209 (-46.125, -13.5947) -> (-45.8857, -14.5265) centre (0, -2.2484) ccw projected
  arc A210 (-46.1633, -15.1116) -> (-45.8857, -14.5265) centre (-46.3687, -14.6557) ccw projected
  arc A211 (-46.1633, -15.1116) -> (-49.6281, -17.7743) centre (-42.2538, -23.7845) ccw projected
  line L40 (-49.2758, -18.8585) -> (-49.6281, -17.7743) projected
  arc A212 (-49.2758, -18.8585) -> (-44.9076, -18.976) centre (-46.8426, -9.6616) ccw projected
  arc A213 (-44.3392, -19.2862) -> (-44.9076, -18.976) centre (-44.8059, -19.4656) ccw projected
  arc A214 (-44.3392, -19.2862) -> (-43.985, -20.1807) centre (0, -2.2484) ccw projected
  arc A215 (-44.1871, -20.7959) -> (-43.985, -20.1807) centre (-44.4481, -20.3694) ccw projected
  arc A216 (-44.1871, -20.7959) -> (-47.2909, -23.8719) centre (-39.2214, -28.9105) ccw projected
  line L41 (-46.8055, -24.9034) -> (-47.2909, -23.8719) projected
  arc A217 (-46.8055, -24.9034) -> (-42.457, -24.4725) centre (-45.5441, -15.4741) ccw projected
  arc A218 (-41.8542, -24.7091) -> (-42.457, -24.4725) centre (-42.2947, -24.9455) ccw projected
  arc A219 (-41.8542, -24.7091) -> (-41.3907, -25.5521) centre (0, -2.2484) ccw projected
  arc A220 (-41.514, -26.1878) -> (-41.3907, -25.5521) centre (-41.8264, -25.7974) ccw projected
  arc A221 (-41.514, -26.1878) -> (-44.2078, -29.6285) centre (-35.5705, -33.616) ccw projected
  line L42 (-43.597, -30.591) -> (-44.2078, -29.6285) projected
  arc A222 (-43.597, -30.591) -> (-39.3368, -29.6186) centre (-43.5274, -21.078) ccw projected
  arc A223 (-38.7091, -29.7777) -> (-39.3368, -29.6186) centre (-39.1165, -30.0674) ccw projected
  arc A224 (-38.7091, -29.7777) -> (-38.1436, -30.5559) centre (0, -2.2484) ccw projected
  arc A225 (-38.1863, -31.2021) -> (-38.1436, -30.5559) centre (-38.5451, -30.8539) ccw projected
  arc A226 (-38.1863, -31.2021) -> (-40.4276, -34.9533) centre (-31.3586, -37.8268) ccw projected
  line L43 (-39.7009, -35.8317) -> (-40.4276, -34.9533) projected
  arc A227 (-39.7009, -35.8317) -> (-35.5962, -34.333) centre (-40.8242, -26.3849) ccw projected
  arc A228 (-34.9535, -34.4121) -> (-35.5962, -34.333) centre (-35.3214, -34.7507) ccw projected
  arc A229 (-34.9535, -34.4121) -> (-34.295, -35.1134) centre (0, -2.2484) ccw projected
  arc A230 (-34.2563, -35.7598) -> (-34.295, -35.1134) centre (-34.656, -35.4593) ccw projected
  arc A231 (-34.2563, -35.7598) -> (-36.0098, -39.7623) centre (-26.6522, -41.4765) ccw projected
  line L44 (-35.1788, -40.5427) -> (-36.0098, -39.7623) projected
  arc A232 (-35.1788, -40.5427) -> (-31.2943, -38.5413) centre (-37.4772, -31.3112) ccw projected
  arc A233 (-30.6467, -38.5393) -> (-31.2943, -38.5413) centre (-30.9693, -38.9213) ccw projected
  arc A234 (-30.6467, -38.5393) -> (-29.9055, -39.1525) centre (0, -2.2484) ccw projected
  arc A235 (-29.7861, -39.789) -> (-29.9055, -39.1525) centre (-30.2203, -39.541) ccw projected
  arc A236 (-29.7861, -39.789) -> (-31.0241, -43.9798) centre (-21.5255, -44.5076) ccw projected
  line L45 (-30.1019, -44.6498) -> (-31.0241, -43.9798) projected
  arc A237 (-30.1019, -44.6498) -> (-26.4988, -42.1774) centre (-33.5391, -35.7792) ccw projected
  arc A238 (-25.8566, -42.0942) -> (-26.4988, -42.1774) centre (-26.1288, -42.5137) ccw projected
  arc A239 (-25.8566, -42.0942) -> (-25.0443, -42.6097) centre (0, -2.2484) ccw projected
  arc A240 (-24.8461, -43.2262) -> (-25.0443, -42.6097) centre (-25.308, -43.0345) ccw projected
  arc A241 (-24.8461, -43.2262) -> (-25.5492, -47.539) centre (-16.0593, -46.8722) ccw projected
  line L46 (-24.5502, -48.0882) -> (-25.5492, -47.539) projected
  arc A242 (-24.5502, -48.0882) -> (-21.2854, -45.1837) centre (-29.0721, -39.7184) ccw projected
  arc A243 (-20.6587, -45.0207) -> (-21.2854, -45.1837) centre (-20.8762, -45.471) ccw projected
  arc A244 (-20.6587, -45.0207) -> (-19.7883, -45.4303) centre (0, -2.2484) ccw projected
  arc A245 (-19.5144, -46.0171) -> (-19.7883, -45.4303) centre (-19.9966, -45.8849) ccw projected
  arc A246 (-19.5144, -46.0171) -> (-19.6713, -50.3841) centre (-10.3398, -48.5331) ccw projected
  line L47 (-18.6114, -50.8037) -> (-19.6713, -50.3841) projected
  arc A247 (-18.6114, -50.8037) -> (-15.7364, -47.5129) centre (-24.1467, -43.0666) ccw projected
  arc A248 (-15.135, -47.2727) -> (-15.7364, -47.5129) centre (-15.2943, -47.7466) ccw projected
  arc A249 (-15.135, -47.2727) -> (-14.2201, -47.5699) centre (0, -2.2484) ccw projected
  arc A250 (-13.8748, -48.1178) -> (-14.2201, -47.5699) centre (-14.3698, -48.047) ccw projected
  arc A251 (-13.8748, -48.1178) -> (-13.4832, -52.47) centre (-4.4572, -49.4641) ccw projected
  line L48 (-12.379, -52.7535) -> (-13.4832, -52.47) projected
  arc A252 (-12.379, -52.7535) -> (-9.9391, -49.1283) centre (-18.8404, -45.7711) ccw projected
  arc A253 (-9.3726, -48.8146) -> (-9.9391, -49.1283) centre (-9.4713, -49.3047) ccw projected
  arc A254 (-9.3726, -48.8146) -> (-8.4277, -48.9948) centre (0, -2.2484) ccw projected
  arc A255 (-8.0165, -49.4951) -> (-8.4277, -48.9948) centre (-8.5164, -49.4869) ccw projected
  arc A256 (-8.0165, -49.4951) -> (-7.0824, -53.7639) centre (1.4956, -49.6504) ccw projected
  line L49 (-5.9514, -53.9067) -> (-7.0824, -53.7639) projected
  arc A257 (-5.9514, -53.9067) -> (-3.9852, -50.0043) centre (-13.237, -47.7893) ccw projected
  arc A258 (-3.4624, -49.6221) -> (-3.9852, -50.0043) centre (-3.4989, -50.1207) ccw projected
  arc A259 (-3.4624, -49.6221) -> (-2.5023, -49.6825) centre (0, -2.2484) ccw projected
  arc A260 (-2.0317, -50.1272) -> (-2.5023, -49.6825) centre (-2.5287, -50.1818) ccw projected
  circle A261 centre (0, -2.2484) radius 21
  circle A262 centre (0, 20.7516) radius 6.0312
  circle A263 centre (0, -25.2484) radius 6.0312
  point P0 (-5.3911, -22.5446)
  point P1 (5.3911, -22.5446)
  point P2 (5.3911, 18.0478)
  point P3 (-5.3911, 18.0478)
  dimension "d0" = 42
extrude "돌출1" add sketch "스케치1" along normal blind 1 contours A263 A5 A261 A262 A4 | A263 A5 | A262 A4 picked at (-0.1641, -18.7025) picked at (0.0932, 14.205)
fillet "모깎기1" radius 2 4 edges at (185.5791, 104.8522, -210.3653) (178.0106, 97.1727, -210.3653) (149.0992, 125.6661, -210.3653) (156.6677, 133.3456, -210.3653)
sketch "스케치2" plane through (168.9405, 113.6809, -209.8653) normal (0, 0, 1) x (0.7122354, -0.7019406, 0)
  arc A0 (-22.0831, 6.8982) -> (-21.4528, 4.687) centre (-20.1941, 6.2412) ccw projected
  arc A1 (-21.4528, -4.687) -> (-21.4528, 4.687) centre (-25.2484, 0) ccw projected
  arc A2 (-21.4528, -4.687) -> (-22.0831, -6.8982) centre (-20.1941, -6.2412) ccw projected
  arc A3 (-22.0831, -6.8982) -> (17.5862, -6.8982) centre (-2.2484, 0) ccw projected
  arc A4 (17.5862, -6.8982) -> (16.9559, -4.687) centre (15.6972, -6.2412) ccw projected
  arc A5 (16.9559, 4.687) -> (16.9559, -4.687) centre (20.7516, 0) ccw projected
  arc A6 (16.9559, 4.687) -> (17.5862, 6.8982) centre (15.6972, 6.2412) ccw projected
  arc A7 (17.5862, 6.8982) -> (-22.0831, 6.8982) centre (-2.2484, 0) ccw projected
  circle A8 centre (-14.8834, 12.8202) radius 1.6 projected
  circle A9 centre (10.3865, -12.8202) radius 1.6 projected
  circle A10 centre (-2.372, -16.9701) radius 1.6 projected
  circle A11 centre (-2.1249, 16.9701) radius 1.6 projected
  circle A12 centre (-15.0687, -12.6349) radius 1.6 projected
  circle A13 centre (10.5718, 12.6349) radius 1.6 projected
  circle A14 centre (-2.2484, 0) radius 13 projected
extrude "돌출2" add sketch "스케치2" along normal blind 1
properties part number "큰기어 와셔2t" material "알루미늄 6061"
